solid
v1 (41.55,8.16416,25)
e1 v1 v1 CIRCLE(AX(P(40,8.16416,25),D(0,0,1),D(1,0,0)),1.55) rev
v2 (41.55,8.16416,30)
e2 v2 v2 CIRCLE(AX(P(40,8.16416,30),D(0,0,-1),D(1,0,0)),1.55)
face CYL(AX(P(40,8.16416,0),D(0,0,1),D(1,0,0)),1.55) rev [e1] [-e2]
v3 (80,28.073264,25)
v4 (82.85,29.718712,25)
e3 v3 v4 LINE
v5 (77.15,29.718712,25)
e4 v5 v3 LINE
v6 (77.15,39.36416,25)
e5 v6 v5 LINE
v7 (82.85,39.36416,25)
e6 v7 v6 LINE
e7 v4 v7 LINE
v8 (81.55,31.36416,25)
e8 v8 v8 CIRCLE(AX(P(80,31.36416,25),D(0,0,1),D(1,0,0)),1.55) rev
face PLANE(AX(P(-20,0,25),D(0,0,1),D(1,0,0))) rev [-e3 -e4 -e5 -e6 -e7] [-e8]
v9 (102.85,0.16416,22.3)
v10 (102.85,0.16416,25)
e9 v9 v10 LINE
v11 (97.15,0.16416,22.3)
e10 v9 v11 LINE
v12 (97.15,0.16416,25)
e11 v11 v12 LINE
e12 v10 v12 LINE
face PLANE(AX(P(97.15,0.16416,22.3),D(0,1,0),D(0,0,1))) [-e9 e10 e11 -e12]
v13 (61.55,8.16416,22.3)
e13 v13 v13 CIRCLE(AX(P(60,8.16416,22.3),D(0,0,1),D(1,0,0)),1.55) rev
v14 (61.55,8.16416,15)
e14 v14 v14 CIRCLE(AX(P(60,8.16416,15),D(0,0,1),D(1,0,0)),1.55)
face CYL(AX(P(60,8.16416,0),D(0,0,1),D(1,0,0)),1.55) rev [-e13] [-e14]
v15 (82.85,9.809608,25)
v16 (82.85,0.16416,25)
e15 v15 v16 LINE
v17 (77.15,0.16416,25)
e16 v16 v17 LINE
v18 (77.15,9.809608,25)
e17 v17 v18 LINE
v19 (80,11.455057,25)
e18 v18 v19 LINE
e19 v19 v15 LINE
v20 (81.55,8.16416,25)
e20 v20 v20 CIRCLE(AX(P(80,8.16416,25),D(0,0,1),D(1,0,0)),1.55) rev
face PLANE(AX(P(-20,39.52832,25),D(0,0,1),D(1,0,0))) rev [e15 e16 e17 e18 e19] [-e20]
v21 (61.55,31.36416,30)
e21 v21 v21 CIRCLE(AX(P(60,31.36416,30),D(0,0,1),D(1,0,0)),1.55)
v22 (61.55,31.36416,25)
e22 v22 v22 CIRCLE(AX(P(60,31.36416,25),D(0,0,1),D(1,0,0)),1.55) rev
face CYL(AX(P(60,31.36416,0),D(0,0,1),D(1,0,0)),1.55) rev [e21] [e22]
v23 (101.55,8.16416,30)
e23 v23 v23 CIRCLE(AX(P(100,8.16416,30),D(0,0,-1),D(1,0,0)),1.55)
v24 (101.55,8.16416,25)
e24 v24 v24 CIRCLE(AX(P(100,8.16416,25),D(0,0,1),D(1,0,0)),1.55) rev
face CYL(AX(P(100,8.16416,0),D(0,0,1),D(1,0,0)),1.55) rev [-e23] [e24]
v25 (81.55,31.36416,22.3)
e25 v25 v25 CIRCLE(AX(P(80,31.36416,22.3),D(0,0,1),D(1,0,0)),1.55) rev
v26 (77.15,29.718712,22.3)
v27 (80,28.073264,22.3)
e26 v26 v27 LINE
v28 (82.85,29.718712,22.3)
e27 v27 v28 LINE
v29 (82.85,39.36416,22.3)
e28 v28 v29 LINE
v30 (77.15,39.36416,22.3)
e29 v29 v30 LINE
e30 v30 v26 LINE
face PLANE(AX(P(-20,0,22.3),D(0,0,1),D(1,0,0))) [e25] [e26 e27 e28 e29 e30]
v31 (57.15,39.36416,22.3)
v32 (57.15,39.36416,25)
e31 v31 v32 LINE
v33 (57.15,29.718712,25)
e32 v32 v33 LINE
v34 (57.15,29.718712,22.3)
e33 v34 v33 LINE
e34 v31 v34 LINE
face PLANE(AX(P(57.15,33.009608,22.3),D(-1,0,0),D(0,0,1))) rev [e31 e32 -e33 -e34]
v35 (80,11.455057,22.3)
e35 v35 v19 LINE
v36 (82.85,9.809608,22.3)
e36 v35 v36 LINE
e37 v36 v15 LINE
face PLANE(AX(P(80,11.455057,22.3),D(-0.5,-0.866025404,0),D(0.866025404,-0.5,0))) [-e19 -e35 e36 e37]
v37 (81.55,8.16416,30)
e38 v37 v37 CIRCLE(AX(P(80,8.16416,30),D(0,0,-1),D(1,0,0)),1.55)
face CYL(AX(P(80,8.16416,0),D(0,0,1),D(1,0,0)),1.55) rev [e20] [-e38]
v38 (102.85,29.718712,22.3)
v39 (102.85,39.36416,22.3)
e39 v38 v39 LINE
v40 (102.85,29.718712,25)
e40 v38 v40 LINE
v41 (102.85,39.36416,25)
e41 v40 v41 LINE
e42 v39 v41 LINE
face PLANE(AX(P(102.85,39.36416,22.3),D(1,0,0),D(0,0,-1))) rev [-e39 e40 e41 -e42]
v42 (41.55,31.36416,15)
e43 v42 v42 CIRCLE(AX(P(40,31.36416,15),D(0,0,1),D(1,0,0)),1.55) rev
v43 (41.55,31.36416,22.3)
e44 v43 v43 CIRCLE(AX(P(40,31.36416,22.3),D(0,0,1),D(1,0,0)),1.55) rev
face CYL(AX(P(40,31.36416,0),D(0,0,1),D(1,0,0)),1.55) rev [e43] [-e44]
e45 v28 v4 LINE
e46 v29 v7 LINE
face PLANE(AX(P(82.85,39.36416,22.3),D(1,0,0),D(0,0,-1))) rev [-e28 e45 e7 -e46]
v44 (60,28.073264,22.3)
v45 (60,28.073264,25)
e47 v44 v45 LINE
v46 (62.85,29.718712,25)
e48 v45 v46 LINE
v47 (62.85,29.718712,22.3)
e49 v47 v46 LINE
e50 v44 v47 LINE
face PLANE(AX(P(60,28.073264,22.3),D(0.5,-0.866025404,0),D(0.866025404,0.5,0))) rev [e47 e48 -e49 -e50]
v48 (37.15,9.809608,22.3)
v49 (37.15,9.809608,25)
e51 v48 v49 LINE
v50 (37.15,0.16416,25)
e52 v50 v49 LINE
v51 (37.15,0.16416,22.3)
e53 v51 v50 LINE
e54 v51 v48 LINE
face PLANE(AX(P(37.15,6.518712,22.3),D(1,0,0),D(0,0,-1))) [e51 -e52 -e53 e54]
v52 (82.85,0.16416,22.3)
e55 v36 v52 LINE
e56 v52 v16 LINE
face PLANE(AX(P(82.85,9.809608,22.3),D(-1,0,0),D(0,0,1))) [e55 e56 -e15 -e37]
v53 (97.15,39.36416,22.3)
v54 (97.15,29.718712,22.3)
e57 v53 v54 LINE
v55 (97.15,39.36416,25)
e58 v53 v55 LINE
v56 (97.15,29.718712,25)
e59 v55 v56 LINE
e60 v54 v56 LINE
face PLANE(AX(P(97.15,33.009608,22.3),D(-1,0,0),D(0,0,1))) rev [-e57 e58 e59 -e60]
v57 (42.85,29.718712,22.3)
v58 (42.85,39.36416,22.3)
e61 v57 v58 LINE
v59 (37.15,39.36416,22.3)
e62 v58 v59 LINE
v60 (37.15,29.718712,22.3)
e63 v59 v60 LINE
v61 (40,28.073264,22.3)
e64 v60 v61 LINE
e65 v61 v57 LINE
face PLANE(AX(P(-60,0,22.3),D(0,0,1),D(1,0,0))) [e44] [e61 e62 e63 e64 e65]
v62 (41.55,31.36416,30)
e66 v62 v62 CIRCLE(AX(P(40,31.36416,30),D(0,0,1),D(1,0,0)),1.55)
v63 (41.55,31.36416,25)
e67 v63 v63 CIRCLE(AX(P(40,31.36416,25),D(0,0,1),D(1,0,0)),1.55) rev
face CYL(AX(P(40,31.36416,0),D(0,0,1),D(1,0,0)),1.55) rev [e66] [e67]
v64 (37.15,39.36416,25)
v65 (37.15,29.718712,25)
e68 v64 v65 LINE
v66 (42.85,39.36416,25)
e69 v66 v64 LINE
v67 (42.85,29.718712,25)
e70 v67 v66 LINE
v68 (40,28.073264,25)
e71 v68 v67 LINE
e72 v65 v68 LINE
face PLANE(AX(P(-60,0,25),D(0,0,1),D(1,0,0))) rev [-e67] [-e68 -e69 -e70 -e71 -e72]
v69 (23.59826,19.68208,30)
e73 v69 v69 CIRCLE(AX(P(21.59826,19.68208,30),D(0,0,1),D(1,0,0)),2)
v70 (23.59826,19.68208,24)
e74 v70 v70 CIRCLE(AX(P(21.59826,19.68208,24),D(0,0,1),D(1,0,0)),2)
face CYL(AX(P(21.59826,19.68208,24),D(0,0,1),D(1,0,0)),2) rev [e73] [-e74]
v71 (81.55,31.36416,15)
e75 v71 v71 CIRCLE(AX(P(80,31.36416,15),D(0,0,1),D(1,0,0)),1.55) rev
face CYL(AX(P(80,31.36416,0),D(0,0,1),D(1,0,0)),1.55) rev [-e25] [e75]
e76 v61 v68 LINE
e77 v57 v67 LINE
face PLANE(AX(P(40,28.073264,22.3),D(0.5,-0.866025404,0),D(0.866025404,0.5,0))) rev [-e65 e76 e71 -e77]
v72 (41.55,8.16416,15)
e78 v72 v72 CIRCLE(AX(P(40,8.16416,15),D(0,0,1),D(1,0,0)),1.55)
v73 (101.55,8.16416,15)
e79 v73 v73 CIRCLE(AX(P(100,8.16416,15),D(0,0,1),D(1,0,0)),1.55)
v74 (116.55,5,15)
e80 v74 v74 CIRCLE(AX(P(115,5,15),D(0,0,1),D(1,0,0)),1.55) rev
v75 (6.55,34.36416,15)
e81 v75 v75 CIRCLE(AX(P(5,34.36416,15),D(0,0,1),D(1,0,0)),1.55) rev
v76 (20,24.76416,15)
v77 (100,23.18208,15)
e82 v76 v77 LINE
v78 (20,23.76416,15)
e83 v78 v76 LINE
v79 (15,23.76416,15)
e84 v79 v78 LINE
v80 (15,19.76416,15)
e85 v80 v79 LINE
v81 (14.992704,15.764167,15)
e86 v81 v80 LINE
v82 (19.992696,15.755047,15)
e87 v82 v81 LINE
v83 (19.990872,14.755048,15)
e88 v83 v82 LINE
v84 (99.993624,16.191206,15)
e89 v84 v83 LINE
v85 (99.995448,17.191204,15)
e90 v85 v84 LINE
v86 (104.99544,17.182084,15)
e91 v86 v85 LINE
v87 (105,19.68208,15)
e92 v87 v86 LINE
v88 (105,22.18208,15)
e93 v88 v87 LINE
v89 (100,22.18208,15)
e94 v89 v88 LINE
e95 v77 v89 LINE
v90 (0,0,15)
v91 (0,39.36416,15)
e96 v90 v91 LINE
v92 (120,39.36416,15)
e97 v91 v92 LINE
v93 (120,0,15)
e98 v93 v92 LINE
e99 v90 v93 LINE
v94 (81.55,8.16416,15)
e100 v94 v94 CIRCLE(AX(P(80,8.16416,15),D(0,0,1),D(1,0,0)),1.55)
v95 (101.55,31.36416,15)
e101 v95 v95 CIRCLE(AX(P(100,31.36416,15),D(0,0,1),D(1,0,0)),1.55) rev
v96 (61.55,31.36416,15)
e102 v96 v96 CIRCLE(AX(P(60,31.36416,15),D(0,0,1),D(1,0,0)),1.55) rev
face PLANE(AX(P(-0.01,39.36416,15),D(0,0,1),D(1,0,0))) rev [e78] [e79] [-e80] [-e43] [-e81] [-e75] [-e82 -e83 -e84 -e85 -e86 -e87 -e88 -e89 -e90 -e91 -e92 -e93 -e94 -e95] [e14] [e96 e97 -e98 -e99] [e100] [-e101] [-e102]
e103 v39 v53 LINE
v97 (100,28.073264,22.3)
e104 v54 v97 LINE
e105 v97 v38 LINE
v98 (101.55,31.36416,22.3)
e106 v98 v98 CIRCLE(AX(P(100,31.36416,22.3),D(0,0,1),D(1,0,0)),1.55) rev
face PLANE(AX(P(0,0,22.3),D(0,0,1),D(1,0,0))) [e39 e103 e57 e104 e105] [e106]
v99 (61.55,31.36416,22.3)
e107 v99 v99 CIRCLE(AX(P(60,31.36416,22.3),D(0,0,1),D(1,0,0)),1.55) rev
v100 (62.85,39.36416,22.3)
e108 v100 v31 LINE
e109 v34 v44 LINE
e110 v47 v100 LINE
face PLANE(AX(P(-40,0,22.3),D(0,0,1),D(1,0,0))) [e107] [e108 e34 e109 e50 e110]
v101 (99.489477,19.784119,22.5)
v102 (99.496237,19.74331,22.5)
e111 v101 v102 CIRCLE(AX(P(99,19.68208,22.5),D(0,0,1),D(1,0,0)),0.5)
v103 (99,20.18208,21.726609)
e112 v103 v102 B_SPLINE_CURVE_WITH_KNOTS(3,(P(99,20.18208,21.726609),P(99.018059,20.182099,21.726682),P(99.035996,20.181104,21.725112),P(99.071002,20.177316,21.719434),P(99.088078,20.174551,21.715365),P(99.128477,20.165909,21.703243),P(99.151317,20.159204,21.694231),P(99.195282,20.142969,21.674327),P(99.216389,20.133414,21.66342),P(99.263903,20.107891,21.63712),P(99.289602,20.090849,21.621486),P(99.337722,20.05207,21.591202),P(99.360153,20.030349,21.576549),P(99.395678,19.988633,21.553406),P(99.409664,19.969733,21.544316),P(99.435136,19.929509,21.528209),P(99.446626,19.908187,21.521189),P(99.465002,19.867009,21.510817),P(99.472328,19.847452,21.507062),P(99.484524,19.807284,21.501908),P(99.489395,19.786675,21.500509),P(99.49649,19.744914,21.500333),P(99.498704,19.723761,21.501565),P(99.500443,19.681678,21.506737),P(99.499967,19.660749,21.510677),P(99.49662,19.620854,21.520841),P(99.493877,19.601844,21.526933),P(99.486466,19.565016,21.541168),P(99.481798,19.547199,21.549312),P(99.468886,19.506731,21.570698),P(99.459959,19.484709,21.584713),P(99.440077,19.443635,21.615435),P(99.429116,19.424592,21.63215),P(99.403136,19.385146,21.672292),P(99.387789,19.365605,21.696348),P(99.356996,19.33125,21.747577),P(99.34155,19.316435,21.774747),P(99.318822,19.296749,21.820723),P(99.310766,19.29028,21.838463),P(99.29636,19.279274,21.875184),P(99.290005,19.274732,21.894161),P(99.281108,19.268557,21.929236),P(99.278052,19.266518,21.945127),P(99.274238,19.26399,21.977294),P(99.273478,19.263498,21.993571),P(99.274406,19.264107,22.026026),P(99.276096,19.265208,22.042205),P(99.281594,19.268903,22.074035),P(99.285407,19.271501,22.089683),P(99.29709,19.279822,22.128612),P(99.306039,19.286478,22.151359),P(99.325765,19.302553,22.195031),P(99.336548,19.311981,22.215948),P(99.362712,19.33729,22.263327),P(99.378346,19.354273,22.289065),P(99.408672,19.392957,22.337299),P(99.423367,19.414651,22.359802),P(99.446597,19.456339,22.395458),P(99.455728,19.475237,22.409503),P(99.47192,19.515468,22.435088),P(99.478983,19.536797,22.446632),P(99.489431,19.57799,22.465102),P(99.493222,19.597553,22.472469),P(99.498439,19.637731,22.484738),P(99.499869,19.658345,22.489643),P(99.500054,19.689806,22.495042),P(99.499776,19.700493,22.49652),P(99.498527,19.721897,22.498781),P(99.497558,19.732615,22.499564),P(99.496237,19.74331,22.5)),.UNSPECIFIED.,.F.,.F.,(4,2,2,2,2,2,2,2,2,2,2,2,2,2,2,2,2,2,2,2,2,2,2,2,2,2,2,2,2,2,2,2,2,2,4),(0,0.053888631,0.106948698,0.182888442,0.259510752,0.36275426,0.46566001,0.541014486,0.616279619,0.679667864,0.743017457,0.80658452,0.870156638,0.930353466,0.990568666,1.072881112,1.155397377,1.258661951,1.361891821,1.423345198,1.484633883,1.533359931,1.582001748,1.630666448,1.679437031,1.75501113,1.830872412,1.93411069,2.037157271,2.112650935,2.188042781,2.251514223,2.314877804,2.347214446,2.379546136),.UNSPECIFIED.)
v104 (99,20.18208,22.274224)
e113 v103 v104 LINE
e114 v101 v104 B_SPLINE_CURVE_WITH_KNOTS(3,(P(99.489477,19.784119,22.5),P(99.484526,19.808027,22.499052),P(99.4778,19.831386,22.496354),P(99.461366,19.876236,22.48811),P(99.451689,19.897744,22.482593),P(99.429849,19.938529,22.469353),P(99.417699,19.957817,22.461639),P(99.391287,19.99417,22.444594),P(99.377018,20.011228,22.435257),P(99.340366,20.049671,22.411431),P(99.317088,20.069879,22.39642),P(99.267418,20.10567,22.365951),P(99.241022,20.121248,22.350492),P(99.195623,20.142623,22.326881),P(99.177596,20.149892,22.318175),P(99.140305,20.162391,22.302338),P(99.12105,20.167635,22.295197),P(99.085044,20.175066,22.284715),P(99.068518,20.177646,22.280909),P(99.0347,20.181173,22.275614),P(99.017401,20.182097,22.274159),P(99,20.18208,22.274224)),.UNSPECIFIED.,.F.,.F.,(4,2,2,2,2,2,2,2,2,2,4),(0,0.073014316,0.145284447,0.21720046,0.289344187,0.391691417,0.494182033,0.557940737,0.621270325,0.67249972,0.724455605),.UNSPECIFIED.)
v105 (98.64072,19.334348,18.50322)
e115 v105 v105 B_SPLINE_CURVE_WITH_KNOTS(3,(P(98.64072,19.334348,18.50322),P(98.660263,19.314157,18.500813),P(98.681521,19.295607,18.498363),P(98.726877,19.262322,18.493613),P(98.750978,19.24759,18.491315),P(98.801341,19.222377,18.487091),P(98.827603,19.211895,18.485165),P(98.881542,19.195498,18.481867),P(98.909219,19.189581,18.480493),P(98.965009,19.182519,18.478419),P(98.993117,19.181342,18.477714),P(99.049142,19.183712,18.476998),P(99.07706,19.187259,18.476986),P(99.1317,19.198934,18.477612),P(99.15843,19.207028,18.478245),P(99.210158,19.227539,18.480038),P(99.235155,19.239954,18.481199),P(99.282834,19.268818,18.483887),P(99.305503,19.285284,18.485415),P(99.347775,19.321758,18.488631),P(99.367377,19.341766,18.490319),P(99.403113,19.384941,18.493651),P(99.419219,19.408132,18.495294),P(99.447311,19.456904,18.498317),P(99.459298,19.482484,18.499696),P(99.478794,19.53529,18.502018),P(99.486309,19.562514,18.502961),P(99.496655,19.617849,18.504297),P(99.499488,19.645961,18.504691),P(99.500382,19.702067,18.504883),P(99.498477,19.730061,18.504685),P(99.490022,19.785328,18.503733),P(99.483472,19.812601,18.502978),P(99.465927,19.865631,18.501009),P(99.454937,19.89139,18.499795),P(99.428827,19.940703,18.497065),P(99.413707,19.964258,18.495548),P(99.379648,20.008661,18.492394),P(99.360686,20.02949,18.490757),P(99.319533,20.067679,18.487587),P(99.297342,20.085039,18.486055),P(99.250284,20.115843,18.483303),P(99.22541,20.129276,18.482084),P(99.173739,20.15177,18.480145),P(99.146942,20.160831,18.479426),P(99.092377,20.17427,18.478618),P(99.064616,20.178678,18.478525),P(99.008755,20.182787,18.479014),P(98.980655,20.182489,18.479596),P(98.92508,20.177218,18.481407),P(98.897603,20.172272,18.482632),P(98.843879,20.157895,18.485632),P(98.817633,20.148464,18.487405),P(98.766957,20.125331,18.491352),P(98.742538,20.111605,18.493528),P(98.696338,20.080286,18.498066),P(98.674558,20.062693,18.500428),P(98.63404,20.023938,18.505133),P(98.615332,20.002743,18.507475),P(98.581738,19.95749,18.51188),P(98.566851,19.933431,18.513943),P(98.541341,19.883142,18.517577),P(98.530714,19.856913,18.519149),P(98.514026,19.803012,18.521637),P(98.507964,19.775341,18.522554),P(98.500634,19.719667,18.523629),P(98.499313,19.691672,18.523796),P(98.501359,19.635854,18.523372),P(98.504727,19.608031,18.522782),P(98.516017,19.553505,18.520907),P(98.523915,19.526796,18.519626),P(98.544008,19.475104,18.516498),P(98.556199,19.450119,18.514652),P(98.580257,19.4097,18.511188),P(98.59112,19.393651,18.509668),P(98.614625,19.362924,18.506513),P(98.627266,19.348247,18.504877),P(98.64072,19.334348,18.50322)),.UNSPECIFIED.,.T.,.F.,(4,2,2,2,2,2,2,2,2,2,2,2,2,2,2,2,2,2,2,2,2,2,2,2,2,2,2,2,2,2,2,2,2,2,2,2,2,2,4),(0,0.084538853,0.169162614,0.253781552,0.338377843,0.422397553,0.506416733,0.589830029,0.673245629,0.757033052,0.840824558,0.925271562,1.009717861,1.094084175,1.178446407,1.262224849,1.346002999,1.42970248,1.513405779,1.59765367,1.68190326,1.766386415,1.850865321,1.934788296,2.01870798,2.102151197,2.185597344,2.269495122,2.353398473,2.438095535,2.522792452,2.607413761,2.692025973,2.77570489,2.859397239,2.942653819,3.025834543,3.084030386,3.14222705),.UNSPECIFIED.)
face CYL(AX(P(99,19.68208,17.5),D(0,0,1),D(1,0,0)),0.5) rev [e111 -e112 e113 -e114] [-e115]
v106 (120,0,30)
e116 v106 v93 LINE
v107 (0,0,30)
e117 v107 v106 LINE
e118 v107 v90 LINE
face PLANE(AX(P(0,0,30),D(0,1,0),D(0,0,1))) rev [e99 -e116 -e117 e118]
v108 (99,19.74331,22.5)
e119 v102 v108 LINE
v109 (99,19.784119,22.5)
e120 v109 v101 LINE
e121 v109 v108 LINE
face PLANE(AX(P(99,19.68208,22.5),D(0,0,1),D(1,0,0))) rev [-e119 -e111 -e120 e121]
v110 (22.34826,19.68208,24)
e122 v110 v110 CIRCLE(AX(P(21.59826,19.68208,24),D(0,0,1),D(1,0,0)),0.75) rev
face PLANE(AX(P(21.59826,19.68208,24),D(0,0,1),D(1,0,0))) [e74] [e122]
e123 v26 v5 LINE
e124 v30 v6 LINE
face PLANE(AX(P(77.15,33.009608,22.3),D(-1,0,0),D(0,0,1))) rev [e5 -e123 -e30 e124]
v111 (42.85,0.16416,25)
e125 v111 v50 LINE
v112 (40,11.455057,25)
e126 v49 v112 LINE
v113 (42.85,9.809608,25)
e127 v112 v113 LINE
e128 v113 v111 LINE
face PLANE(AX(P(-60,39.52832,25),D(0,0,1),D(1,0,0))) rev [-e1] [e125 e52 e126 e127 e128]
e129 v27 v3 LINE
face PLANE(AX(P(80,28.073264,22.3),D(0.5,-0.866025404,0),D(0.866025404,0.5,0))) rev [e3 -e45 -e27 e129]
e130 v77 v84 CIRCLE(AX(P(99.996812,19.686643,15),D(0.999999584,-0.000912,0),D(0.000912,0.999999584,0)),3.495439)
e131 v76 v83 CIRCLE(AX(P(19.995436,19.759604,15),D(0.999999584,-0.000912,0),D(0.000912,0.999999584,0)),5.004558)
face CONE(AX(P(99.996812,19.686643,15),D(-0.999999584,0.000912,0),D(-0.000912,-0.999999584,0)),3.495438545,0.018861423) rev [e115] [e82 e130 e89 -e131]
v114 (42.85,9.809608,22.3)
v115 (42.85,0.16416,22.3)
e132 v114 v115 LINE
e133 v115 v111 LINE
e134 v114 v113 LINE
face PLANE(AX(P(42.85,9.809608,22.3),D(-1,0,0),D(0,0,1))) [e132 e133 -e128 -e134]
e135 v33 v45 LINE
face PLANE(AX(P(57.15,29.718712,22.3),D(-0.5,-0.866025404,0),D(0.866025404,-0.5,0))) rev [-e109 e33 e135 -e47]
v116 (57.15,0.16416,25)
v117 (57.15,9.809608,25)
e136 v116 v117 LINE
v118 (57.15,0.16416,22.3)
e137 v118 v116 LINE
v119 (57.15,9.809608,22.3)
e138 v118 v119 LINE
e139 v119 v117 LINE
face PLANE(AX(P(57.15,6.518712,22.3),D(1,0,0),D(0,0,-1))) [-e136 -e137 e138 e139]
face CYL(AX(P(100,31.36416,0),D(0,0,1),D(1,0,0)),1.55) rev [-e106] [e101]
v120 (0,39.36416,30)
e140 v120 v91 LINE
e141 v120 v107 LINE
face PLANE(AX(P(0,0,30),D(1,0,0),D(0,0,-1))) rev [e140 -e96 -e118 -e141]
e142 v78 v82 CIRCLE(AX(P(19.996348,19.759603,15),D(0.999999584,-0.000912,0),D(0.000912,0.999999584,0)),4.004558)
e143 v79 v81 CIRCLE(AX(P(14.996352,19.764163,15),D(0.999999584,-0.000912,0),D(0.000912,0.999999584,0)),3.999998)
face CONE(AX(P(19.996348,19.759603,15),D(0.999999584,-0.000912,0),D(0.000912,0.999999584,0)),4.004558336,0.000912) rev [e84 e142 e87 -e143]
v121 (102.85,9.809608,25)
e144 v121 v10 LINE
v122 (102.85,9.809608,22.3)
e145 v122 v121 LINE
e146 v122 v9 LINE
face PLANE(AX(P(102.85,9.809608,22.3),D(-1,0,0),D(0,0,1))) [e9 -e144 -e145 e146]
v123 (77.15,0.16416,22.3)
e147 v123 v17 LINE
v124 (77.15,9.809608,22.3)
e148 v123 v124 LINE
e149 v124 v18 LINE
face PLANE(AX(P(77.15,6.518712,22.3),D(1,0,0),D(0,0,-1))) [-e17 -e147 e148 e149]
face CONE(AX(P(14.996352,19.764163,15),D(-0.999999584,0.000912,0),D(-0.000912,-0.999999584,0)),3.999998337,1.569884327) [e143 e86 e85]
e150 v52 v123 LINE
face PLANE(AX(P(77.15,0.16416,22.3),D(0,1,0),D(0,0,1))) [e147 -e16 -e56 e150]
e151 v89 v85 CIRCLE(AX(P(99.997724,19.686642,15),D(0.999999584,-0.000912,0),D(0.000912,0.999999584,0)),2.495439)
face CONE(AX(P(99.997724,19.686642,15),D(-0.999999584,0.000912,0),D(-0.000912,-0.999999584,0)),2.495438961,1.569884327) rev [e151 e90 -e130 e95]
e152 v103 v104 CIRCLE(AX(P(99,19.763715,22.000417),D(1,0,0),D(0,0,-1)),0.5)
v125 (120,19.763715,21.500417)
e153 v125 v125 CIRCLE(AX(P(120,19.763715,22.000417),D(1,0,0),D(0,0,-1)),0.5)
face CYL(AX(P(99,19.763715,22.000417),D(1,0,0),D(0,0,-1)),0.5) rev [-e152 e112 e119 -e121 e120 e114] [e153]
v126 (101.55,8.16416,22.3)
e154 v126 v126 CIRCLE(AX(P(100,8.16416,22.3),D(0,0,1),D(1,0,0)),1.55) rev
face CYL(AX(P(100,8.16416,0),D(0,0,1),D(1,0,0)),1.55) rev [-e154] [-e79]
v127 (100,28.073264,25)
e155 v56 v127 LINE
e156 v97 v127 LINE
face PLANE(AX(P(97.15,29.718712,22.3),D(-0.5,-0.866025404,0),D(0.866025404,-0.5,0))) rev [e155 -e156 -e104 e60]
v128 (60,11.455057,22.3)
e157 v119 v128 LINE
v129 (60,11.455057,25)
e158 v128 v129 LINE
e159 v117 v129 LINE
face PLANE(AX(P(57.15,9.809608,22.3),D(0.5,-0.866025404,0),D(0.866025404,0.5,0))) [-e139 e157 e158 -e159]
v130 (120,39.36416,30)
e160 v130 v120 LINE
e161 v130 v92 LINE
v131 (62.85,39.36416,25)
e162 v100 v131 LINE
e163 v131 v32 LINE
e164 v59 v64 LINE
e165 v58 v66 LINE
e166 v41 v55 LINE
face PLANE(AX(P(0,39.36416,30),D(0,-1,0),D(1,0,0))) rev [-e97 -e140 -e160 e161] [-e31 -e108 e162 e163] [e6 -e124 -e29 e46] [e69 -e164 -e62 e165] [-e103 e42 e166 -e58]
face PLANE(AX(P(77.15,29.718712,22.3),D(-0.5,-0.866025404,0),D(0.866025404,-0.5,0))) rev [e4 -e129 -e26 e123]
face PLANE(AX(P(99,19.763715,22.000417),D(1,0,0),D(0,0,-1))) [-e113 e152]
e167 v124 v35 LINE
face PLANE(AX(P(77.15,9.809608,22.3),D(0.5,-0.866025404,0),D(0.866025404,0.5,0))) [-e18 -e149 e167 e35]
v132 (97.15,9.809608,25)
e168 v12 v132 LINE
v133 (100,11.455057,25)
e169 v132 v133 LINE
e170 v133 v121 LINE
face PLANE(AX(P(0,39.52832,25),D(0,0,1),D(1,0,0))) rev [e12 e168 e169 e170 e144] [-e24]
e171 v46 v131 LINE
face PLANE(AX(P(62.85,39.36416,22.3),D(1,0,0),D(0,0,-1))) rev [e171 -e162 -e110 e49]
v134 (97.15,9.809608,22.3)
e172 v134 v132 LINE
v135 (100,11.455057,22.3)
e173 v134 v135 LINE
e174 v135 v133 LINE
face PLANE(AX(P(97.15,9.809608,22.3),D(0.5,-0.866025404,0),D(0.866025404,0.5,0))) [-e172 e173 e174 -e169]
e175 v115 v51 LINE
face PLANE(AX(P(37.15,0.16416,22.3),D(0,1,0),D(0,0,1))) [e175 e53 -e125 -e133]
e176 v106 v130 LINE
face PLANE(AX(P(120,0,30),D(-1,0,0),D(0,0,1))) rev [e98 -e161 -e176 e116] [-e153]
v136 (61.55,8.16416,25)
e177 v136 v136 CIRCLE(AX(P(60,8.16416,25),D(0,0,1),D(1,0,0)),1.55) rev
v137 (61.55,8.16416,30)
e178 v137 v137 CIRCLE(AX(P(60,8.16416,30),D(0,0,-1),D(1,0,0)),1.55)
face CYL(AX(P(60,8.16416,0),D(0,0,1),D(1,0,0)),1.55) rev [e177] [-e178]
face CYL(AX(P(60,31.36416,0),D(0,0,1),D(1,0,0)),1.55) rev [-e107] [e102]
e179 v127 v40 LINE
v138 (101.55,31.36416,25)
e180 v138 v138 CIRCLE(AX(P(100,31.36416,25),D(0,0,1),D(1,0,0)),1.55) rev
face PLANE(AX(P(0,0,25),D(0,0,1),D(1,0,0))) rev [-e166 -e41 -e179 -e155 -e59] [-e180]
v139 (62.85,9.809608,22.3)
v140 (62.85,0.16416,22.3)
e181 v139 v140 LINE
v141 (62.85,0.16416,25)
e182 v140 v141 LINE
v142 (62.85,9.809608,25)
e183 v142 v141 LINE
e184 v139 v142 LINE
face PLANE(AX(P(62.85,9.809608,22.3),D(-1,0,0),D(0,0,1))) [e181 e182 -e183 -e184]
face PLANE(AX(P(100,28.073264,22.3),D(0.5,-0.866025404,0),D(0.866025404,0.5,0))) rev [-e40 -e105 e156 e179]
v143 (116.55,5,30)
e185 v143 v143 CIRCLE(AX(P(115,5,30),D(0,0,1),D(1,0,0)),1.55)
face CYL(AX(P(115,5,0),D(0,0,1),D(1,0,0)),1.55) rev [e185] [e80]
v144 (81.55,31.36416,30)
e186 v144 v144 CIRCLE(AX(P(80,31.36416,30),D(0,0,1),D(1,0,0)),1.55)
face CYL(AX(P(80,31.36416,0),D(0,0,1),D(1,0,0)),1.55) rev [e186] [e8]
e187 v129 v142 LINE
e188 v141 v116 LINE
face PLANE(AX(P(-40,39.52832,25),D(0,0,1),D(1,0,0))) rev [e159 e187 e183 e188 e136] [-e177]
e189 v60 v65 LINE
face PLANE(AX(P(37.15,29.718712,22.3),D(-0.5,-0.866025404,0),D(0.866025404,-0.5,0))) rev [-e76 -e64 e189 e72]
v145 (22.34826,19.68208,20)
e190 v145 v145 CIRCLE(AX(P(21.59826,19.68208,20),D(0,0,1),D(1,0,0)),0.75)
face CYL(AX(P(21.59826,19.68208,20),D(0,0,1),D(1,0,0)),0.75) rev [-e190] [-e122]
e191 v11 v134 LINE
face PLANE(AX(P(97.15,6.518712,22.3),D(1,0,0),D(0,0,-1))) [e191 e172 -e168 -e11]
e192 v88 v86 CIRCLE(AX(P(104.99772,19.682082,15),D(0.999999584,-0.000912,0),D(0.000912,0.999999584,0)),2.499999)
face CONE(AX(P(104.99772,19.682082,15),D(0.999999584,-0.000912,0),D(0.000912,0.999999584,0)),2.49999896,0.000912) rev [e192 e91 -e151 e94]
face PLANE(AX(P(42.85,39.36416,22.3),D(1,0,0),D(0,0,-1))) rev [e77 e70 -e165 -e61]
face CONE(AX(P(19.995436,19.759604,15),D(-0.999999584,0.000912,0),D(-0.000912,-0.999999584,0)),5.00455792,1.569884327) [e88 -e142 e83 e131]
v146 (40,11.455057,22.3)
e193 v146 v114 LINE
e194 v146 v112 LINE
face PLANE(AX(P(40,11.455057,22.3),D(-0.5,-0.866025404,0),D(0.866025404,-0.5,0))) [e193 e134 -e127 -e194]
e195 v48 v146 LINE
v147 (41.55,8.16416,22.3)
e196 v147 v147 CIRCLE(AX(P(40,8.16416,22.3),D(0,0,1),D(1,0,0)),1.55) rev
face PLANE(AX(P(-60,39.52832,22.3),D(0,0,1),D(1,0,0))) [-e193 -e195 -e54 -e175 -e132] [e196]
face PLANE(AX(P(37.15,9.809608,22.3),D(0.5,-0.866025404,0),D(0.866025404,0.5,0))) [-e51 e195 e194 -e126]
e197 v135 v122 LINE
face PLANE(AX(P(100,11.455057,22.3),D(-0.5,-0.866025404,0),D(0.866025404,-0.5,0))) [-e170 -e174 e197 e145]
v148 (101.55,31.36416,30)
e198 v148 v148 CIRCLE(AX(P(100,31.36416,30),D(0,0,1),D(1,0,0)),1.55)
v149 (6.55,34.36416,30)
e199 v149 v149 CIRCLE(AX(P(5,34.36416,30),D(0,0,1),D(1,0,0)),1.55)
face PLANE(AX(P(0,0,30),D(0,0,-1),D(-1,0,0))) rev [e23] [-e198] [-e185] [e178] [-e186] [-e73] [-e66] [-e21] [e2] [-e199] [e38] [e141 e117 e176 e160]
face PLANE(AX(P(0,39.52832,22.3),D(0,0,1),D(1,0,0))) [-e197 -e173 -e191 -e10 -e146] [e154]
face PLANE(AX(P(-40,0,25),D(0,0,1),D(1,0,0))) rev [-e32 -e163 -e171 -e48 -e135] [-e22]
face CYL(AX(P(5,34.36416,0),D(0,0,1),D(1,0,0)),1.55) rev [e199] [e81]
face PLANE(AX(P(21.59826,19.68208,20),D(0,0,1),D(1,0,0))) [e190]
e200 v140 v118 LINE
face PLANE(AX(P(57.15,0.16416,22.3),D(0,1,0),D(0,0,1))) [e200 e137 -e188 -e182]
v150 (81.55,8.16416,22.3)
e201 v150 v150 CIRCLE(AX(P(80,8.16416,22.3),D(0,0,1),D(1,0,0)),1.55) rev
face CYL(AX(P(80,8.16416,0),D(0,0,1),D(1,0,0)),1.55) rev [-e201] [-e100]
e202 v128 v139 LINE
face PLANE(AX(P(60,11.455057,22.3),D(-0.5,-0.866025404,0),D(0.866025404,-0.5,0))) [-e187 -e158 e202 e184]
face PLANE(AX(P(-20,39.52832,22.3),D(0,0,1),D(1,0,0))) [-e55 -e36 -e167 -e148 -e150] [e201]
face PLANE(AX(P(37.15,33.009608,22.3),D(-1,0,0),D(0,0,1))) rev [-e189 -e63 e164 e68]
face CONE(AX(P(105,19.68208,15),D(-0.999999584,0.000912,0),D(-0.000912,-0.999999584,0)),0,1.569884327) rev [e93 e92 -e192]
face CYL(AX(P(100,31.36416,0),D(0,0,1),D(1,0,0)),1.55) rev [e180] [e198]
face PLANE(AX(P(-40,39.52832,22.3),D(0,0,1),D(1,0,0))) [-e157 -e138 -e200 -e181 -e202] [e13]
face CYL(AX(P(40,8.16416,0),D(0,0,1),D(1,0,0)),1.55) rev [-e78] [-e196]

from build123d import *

# Parameters (mm, degrees)
SKIZZE2_W                        = 120
SKIZZE2_H                        = 39.364160046
AUFSATZ_LINEAR_AUSTRAGEN1_DEPTH  = 30
SKIZZE24_R                       = 1.55
SCHNITT_LINEAR_AUSTRAGEN4_DEPTH  = 130.805766806
SKIZZE46_R                       = 2.85
SCHNITT_LINEAR_AUSTRAGEN15_DEPTH = 10
SCHNITT_LINEAR_START             = -5
SCHNITT_LINEAR_AUSTRAGEN25_DEPTH = 2.7
LINEARES_MUSTER1_COUNT           = 4
LINEARES_MUSTER1_PITCH           = 20
SPIEGELN2_COPY_1_SKETCH_R        = 2.85
SPIEGELN2_COPY_1_DEPTH           = 10
SPIEGELN2_COPY_2_SKETCH_R        = 2.85
SPIEGELN2_COPY_2_DEPTH           = 10
SPIEGELN2_COPY_3_SKETCH_R        = 2.85
SPIEGELN2_COPY_3_DEPTH           = 10
SPIEGELN2_START                  = -5
SPIEGELN2_COPY_4_DEPTH           = 2.7
SPIEGELN2_COPY_5_DEPTH           = 2.7
SPIEGELN2_COPY_6_DEPTH           = 2.7
SKIZZE51_R                       = 1.55
SCHNITT_LINEAR_AUSTRAGEN26_DEPTH = 130.805766806
SKIZZE75_R                       = 0.75
SCHNITT_LINEAR_AUSTRAGEN28_DEPTH = 10
SKIZZE76_R                       = 2
SCHNITT_LINEAR_AUSTRAGEN29_DEPTH = 6
SKIZZE80_R                       = 0.5
SCHNITT_LINEAR_AUSTRAGEN34_DEPTH = 21
SCHNITT_LINEAR_START_2           = -7.5
SKIZZE81_R                       = 0.5
SCHNITT_LINEAR_AUSTRAGEN36_DEPTH = 5
ABSPALTEN3_OUTLINE_W             = 120
ABSPALTEN3_OUTLINE_H             = 39.364160046
ABSPALTEN3_OUTLINE_R             = 1.55
ABSPALTEN3_DEPTH                 = 15


# Read off the part's stored shape, not the designer's step: Abspalten3
with BuildPart() as part:
    # Skizze2 → Aufsatz-Linear austragen1 (new body)
    with BuildSketch(Plane.XY):
        with Locations((60, 19.682080023)):
            Rectangle(SKIZZE2_W, SKIZZE2_H)
    extrude(amount=AUFSATZ_LINEAR_AUSTRAGEN1_DEPTH)

    # Skizze24 → Schnitt-Linear austragen4 (cut, through all)
    with BuildSketch(Plane.XY.offset(30)):
        with Locations((40, 31.364160046)):
            Circle(SKIZZE24_R)
        with Locations((60, 31.364160046)):
            Circle(SKIZZE24_R)
        with Locations((80, 31.364160046)):
            Circle(SKIZZE24_R)
        with Locations((100, 31.364160046)):
            Circle(SKIZZE24_R)
    schnitt_linear_austragen4 = extrude(amount=-SCHNITT_LINEAR_AUSTRAGEN4_DEPTH, mode=Mode.SUBTRACT)

    # Skizze46 → Schnitt-Linear austragen15 (cut)
    with BuildSketch(Plane(origin=(0, 0, 0), x_dir=(-1, 0, 0), z_dir=(0, 0, -1))):
        with Locations((-100, 31.364160046)):
            Circle(SKIZZE46_R)
    schnitt_linear_austragen15 = extrude(amount=-SCHNITT_LINEAR_AUSTRAGEN15_DEPTH, mode=Mode.SUBTRACT)

    # Skizze50 → Schnitt-Linear austragen25 (cut)
    with BuildSketch(Plane.XY.offset(30).offset(SCHNITT_LINEAR_START)):
        Polygon((97.15, 33.009608314), (97.15, 39.364160046), (102.85, 39.364160046), (102.85, 33.009608314), (102.85, 29.718711779), (100, 28.073263512), (97.15, 29.718711779), align=None)
    schnitt_linear_austragen25 = extrude(amount=-SCHNITT_LINEAR_AUSTRAGEN25_DEPTH, mode=Mode.SUBTRACT)

    # Lineares Muster1: Schnitt-Linear austragen15, Schnitt-Linear austragen25 ×4
    with Locations(*[(-i * LINEARES_MUSTER1_PITCH, 0, 0) for i in range(1, LINEARES_MUSTER1_COUNT)]):
        add(schnitt_linear_austragen15, mode=Mode.SUBTRACT)
        add(schnitt_linear_austragen25, mode=Mode.SUBTRACT)

    # Spiegeln2: Schnitt-Linear austragen15, Schnitt-Linear austragen25 across plane
    add(schnitt_linear_austragen15.mirror(Plane.ZX.offset(19.764160046)), mode=Mode.SUBTRACT)
    add(schnitt_linear_austragen25.mirror(Plane.ZX.offset(19.764160046)), mode=Mode.SUBTRACT)

    # Spiegeln2 copy 1 sketch → Spiegeln2 copy 1 (cut)
    with BuildSketch(Plane(origin=(-20, 39.528320093, 0), x_dir=(-1, 0, 0), z_dir=(0, 0, -1))):
        with Locations((-100, -31.364160046)):
            Circle(SPIEGELN2_COPY_1_SKETCH_R)
    extrude(amount=-SPIEGELN2_COPY_1_DEPTH, mode=Mode.SUBTRACT)

    # Spiegeln2 copy 2 sketch → Spiegeln2 copy 2 (cut)
    with BuildSketch(Plane(origin=(-40, 39.528320093, 0), x_dir=(-1, 0, 0), z_dir=(0, 0, -1))):
        with Locations((-100, -31.364160046)):
            Circle(SPIEGELN2_COPY_2_SKETCH_R)
    extrude(amount=-SPIEGELN2_COPY_2_DEPTH, mode=Mode.SUBTRACT)

    # Spiegeln2 copy 3 sketch → Spiegeln2 copy 3 (cut)
    with BuildSketch(Plane(origin=(-60, 39.528320093, 0), x_dir=(-1, 0, 0), z_dir=(0, 0, -1))):
        with Locations((-100, -31.364160046)):
            Circle(SPIEGELN2_COPY_3_SKETCH_R)
    extrude(amount=-SPIEGELN2_COPY_3_DEPTH, mode=Mode.SUBTRACT)

    # Spiegeln2 copy 4 sketch → Spiegeln2 copy 4 (cut)
    with BuildSketch(Plane(origin=(-20, 39.528320093, 30), x_dir=(1, 0, 0), z_dir=(0, 0, 1)).offset(SPIEGELN2_START)):
        Polygon((97.15, -33.009608314), (97.15, -39.364160046), (102.85, -39.364160046), (102.85, -33.009608314), (102.85, -29.718711779), (100, -28.073263512), (97.15, -29.718711779), align=None)
    extrude(amount=-SPIEGELN2_COPY_4_DEPTH, mode=Mode.SUBTRACT)

    # Spiegeln2 copy 5 sketch → Spiegeln2 copy 5 (cut)
    with BuildSketch(Plane(origin=(-40, 39.528320093, 30), x_dir=(1, 0, 0), z_dir=(0, 0, 1)).offset(SPIEGELN2_START)):
        Polygon((97.15, -33.009608314), (97.15, -39.364160046), (102.85, -39.364160046), (102.85, -33.009608314), (102.85, -29.718711779), (100, -28.073263512), (97.15, -29.718711779), align=None)
    extrude(amount=-SPIEGELN2_COPY_5_DEPTH, mode=Mode.SUBTRACT)

    # Spiegeln2 copy 6 sketch → Spiegeln2 copy 6 (cut)
    with BuildSketch(Plane(origin=(-60, 39.528320093, 30), x_dir=(1, 0, 0), z_dir=(0, 0, 1)).offset(SPIEGELN2_START)):
        Polygon((97.15, -33.009608314), (97.15, -39.364160046), (102.85, -39.364160046), (102.85, -33.009608314), (102.85, -29.718711779), (100, -28.073263512), (97.15, -29.718711779), align=None)
    extrude(amount=-SPIEGELN2_COPY_6_DEPTH, mode=Mode.SUBTRACT)

    # Spiegeln3: Schnitt-Linear austragen4 across plane
    add(schnitt_linear_austragen4.mirror(Plane.ZX.offset(19.764160046)), mode=Mode.SUBTRACT)

    # Skizze51 → Schnitt-Linear austragen26 (cut, through all)
    with BuildSketch(Plane.XY.offset(30)):
        with Locations((5, 34.364160046)):
            Circle(SKIZZE51_R)
        with Locations((115, 5)):
            Circle(SKIZZE51_R)
    extrude(amount=-SCHNITT_LINEAR_AUSTRAGEN26_DEPTH, mode=Mode.SUBTRACT)

    # Skizze73 → Schnitt-Rotation5 (revolve, cut)
    with BuildSketch(Plane.XY.offset(15)):
        Polygon((15, 19.764160046), (15, 23.764160046), (20, 23.764160046), (20, 24.764160046), (100, 23.182080023), (100, 22.182080023), (105, 22.182080023), (105, 19.682080023), align=None)
    revolve(axis=Axis((105, 19.682080023, 15), (-0.9999995841280241, 0.0009119998787298228, 0)), mode=Mode.SUBTRACT)

    # Skizze75 → Schnitt-Linear austragen28 (cut)
    with BuildSketch(Plane.XY.offset(30)):
        with Locations((21.598259807, 19.682080023)):
            Circle(SKIZZE75_R)
    extrude(amount=-SCHNITT_LINEAR_AUSTRAGEN28_DEPTH, mode=Mode.SUBTRACT)

    # Skizze76 → Schnitt-Linear austragen29 (cut)
    with BuildSketch(Plane.XY.offset(30)):
        with Locations((21.598259807, 19.682080023)):
            Circle(SKIZZE76_R)
    extrude(amount=-SCHNITT_LINEAR_AUSTRAGEN29_DEPTH, mode=Mode.SUBTRACT)

    # Skizze80 → Schnitt-Linear austragen34 (cut)
    with BuildSketch(Plane(origin=(120, 0, 0), x_dir=(0, 0, -1), z_dir=(1, 0, 0))):
        with Locations((-22.000416524, 19.763714623)):
            Circle(SKIZZE80_R)
    schnitt_linear_austragen34 = extrude(amount=-SCHNITT_LINEAR_AUSTRAGEN34_DEPTH, mode=Mode.SUBTRACT)

    # Skizze81 → Schnitt-Linear austragen36 (cut)
    with BuildSketch(Plane.XY.offset(30).offset(SCHNITT_LINEAR_START_2)):
        with Locations(Location((99, 19.682080023, 0), (0, 0, 7.034090001))):
            Circle(SKIZZE81_R)
    schnitt_linear_austragen36 = extrude(amount=-SCHNITT_LINEAR_AUSTRAGEN36_DEPTH, mode=Mode.SUBTRACT)

    # Spiegeln4: Schnitt-Linear austragen34, Schnitt-Linear austragen36 across plane
    add(schnitt_linear_austragen34.mirror(Plane.XY.offset(15)), mode=Mode.SUBTRACT)
    add(schnitt_linear_austragen36.mirror(Plane.XY.offset(15)), mode=Mode.SUBTRACT)

    # Abspalten3 outline → Abspalten3 (cut)
    with BuildSketch(Plane.XY):
        with Locations((60, 19.682080023)):
            Rectangle(ABSPALTEN3_OUTLINE_W, ABSPALTEN3_OUTLINE_H)
        with Locations((115, 5)):
            Circle(ABSPALTEN3_OUTLINE_R, mode=Mode.SUBTRACT)
        with Locations((5, 34.364160046)):
            Circle(ABSPALTEN3_OUTLINE_R, mode=Mode.SUBTRACT)
        with Locations((40, 8.164160046)):
            Circle(ABSPALTEN3_OUTLINE_R, mode=Mode.SUBTRACT)
        with Locations((60, 8.164160046)):
            Circle(ABSPALTEN3_OUTLINE_R, mode=Mode.SUBTRACT)
        with Locations((80, 8.164160046)):
            Circle(ABSPALTEN3_OUTLINE_R, mode=Mode.SUBTRACT)
        with Locations((100, 8.164160046)):
            Circle(ABSPALTEN3_OUTLINE_R, mode=Mode.SUBTRACT)
        with Locations((40, 31.364160046)):
            Circle(ABSPALTEN3_OUTLINE_R, mode=Mode.SUBTRACT)
        with Locations((100, 31.364160046)):
            Circle(ABSPALTEN3_OUTLINE_R, mode=Mode.SUBTRACT)
        with Locations((60, 31.364160046)):
            Circle(ABSPALTEN3_OUTLINE_R, mode=Mode.SUBTRACT)
        with Locations((80, 31.364160046)):
            Circle(ABSPALTEN3_OUTLINE_R, mode=Mode.SUBTRACT)
    extrude(amount=ABSPALTEN3_DEPTH, mode=Mode.SUBTRACT)


solid = part.part
